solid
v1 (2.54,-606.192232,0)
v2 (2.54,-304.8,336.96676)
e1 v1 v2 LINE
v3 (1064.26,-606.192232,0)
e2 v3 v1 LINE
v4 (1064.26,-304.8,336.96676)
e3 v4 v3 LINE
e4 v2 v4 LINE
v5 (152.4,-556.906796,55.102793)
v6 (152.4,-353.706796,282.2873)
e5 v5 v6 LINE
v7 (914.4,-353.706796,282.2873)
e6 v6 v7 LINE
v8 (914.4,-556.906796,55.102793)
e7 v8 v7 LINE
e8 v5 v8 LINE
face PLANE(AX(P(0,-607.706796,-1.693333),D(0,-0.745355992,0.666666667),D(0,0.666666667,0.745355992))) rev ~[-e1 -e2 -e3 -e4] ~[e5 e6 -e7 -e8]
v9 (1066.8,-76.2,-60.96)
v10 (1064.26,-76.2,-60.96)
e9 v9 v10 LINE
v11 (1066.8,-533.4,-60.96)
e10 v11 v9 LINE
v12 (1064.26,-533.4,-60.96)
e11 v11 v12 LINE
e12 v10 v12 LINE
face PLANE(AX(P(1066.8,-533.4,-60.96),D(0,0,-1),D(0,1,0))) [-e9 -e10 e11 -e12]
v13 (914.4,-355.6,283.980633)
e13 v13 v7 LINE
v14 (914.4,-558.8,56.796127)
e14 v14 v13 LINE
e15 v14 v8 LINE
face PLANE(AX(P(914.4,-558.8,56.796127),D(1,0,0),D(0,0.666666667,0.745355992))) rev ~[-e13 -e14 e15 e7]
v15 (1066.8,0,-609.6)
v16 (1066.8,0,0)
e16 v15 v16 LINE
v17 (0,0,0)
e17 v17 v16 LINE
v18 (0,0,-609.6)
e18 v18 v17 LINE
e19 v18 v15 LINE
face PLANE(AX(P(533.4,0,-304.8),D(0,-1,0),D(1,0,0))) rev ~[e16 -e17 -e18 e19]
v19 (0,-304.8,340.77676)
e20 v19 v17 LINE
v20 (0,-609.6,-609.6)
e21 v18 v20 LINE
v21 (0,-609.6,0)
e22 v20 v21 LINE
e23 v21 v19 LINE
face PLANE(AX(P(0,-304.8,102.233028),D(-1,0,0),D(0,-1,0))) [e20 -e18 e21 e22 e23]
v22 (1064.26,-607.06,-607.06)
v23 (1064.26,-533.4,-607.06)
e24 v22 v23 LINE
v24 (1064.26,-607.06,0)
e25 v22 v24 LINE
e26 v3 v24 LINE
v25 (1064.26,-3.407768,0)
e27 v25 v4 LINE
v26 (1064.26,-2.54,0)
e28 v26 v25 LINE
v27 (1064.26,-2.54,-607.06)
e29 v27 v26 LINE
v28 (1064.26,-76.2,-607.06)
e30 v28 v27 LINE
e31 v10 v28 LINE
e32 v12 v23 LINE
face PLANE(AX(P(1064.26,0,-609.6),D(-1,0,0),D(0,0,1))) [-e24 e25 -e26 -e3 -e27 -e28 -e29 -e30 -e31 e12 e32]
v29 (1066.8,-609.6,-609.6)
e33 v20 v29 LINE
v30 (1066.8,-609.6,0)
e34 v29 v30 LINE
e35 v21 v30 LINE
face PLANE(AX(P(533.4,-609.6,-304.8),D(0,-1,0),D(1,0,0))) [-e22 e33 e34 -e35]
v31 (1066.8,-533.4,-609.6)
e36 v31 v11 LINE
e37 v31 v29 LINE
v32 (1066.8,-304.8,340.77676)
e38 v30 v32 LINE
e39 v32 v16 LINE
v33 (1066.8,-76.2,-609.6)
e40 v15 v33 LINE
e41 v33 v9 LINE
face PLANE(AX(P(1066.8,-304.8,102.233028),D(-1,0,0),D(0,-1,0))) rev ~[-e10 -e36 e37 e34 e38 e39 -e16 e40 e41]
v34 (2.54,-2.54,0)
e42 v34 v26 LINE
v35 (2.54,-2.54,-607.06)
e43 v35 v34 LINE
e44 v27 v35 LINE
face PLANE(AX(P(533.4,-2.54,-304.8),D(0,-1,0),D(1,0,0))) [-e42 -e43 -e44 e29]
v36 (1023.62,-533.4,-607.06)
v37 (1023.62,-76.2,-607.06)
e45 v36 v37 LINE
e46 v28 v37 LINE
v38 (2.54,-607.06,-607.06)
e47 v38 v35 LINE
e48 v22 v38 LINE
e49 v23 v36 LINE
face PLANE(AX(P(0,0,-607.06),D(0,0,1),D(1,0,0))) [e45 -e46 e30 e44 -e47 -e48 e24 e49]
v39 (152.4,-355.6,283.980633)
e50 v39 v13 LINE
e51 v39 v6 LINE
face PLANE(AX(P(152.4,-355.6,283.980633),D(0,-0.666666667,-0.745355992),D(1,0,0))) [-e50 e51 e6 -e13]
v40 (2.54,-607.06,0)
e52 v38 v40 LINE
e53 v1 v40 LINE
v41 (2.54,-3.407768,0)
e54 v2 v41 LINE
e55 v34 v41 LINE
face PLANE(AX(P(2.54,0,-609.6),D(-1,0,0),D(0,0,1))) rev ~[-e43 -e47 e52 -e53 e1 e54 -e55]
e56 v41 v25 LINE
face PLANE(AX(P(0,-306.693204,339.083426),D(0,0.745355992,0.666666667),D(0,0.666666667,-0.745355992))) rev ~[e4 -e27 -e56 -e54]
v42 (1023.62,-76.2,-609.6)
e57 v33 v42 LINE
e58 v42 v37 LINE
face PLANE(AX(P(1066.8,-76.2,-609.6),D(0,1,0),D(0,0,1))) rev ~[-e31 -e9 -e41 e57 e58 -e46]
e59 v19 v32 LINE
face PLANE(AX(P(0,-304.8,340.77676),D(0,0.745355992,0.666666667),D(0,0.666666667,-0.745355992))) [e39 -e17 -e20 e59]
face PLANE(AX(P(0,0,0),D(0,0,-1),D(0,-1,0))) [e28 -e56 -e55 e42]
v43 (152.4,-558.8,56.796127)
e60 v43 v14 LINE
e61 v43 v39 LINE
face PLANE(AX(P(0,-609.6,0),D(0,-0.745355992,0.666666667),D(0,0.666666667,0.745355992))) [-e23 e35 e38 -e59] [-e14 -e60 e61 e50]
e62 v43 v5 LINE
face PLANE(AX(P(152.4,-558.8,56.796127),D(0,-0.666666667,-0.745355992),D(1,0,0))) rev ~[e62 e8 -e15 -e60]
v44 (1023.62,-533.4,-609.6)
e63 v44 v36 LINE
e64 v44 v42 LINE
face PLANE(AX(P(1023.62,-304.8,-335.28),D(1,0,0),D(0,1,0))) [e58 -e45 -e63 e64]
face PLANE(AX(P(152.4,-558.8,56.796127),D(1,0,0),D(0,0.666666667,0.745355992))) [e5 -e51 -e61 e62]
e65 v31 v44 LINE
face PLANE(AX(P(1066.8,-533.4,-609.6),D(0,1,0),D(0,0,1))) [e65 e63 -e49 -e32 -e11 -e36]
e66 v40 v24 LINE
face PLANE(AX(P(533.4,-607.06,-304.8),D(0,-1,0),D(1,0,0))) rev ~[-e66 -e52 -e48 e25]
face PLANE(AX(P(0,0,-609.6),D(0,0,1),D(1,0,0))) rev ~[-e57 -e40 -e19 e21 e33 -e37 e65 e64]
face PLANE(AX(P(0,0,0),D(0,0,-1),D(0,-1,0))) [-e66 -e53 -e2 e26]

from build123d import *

# Parameters (mm, degrees)
F0_W         = 1066.8
F0_H         = 609.6
F1_DEPTH     = 609.6
F2_T         = -2.54
F3_W         = 457.2
F3_H         = 548.64
F4_DEPTH     = 43.18
F6_DEPTH     = 1066.8
F7_T         = 2.54
F7_T3_DEPTH  = 7.62
F7_T5_DEPTH  = 7.62
F7_T7_DEPTH  = 612.14
F7_T9_DEPTH  = 78.74
F7_T11_DEPTH = 78.74
F7_T13_DEPTH = 1066.8
F7_T15_DEPTH = 609.6
F8_W         = 762
F8_H         = 304.8
F9_DEPTH     = 25.4


# Not quite as in the source:
# - a shell that OpenCascade refuses in one call is made with other operations: the cavity is built on its own and cut out


with BuildPart() as f1:
    # F0 (on Front) → F1 (new body)
    with BuildSketch(Plane.XZ):
        with Locations((533.4, -304.8)):
            Rectangle(F0_W, F0_H)
    extrude(amount=F1_DEPTH)

    # F2
    f2_openings = [f1.faces().sort_by_distance(p)[0] for p in [
        (533.4, -304.8, 0),
    ]]
    offset(amount=F2_T, openings=f2_openings)

    # F3 (on face) → F4 (cut)
    with BuildSketch(Plane.YZ.offset(1066.8)):
        with Locations((-304.8, -335.28)):
            Rectangle(F3_W, F3_H)
    extrude(amount=-F4_DEPTH, mode=Mode.SUBTRACT)

    # F5 (on face) → F6 (join)
    with BuildSketch(Plane(origin=(0, 0, 0), x_dir=(0, -1, 0), z_dir=(-1, 0, 0))):
        Polygon((304.8, 340.776759771), (0, 0), (609.6, 0), align=None)
    extrude(amount=-F6_DEPTH)

    # F7: shell of thickness 2.54, made by hand


with BuildPart() as f7_core1:
    # F7_t2: copy of F1
    add(f1.part)

    # the walls: a layer under each face that stays
    f7_faces = [f7_core1.faces().sort_by_distance(p)[0] for p in [
        (0, -304.8, -134.4116201145),
        (533.4, -304.8, -609.6),
        (533.4, 0, -304.8),
        (533.4, -609.6, -304.8),
        (533.4, -152.4, 170.3883798855),
        (533.4, -457.2, 170.3883798855),
        (1066.8, -304.8, 182.3806331425),
        (1065.3606666667, -76.2, -591.312),
        (1023.62, -304.8, -608.33),
        (1065.3606666667, -533.4, -79.248),
        (1065.53, -304.8, -60.96),
        (1064.26, -563.88, -563.6985714286),
        (533.4, -304.8, -607.06),
        (533.4, -607.06, -303.53),
        (533.4, -2.54, -303.53),
        (2.54, -304.8, -303.53),
    ]]
    thicken(f7_faces, amount=-F7_T, mode=Mode.SUBTRACT)

    # F7_s4 → F7_t3 (cut)
    with BuildSketch(Plane.YZ.offset(1061.72)):
        Polygon((-76.2254, -60.9854), (-73.66, -60.96), (-73.66, -58.42), (-76.2, -58.42), align=None)
        Polygon((-533.3746, -60.9854), (-535.94, -60.96), (-535.94, -58.42), (-533.4, -58.42), align=None)
    extrude(amount=F7_T3_DEPTH, mode=Mode.SUBTRACT)

    # F7_s6 → F7_t5 (cut)
    with BuildSketch(Plane.XY.offset(-612.14)):
        Polygon((1023.6454, -76.2254), (1023.62, -73.66), (1021.08, -73.66), (1021.08, -76.2), align=None)
        Polygon((1023.6454, -533.3746), (1021.08, -533.4), (1021.08, -535.94), (1023.62, -535.94), align=None)
    extrude(amount=F7_T5_DEPTH, mode=Mode.SUBTRACT)

    # F7_s8 → F7_t7 (cut)
    with BuildSketch(Plane.XY.offset(-609.6)):
        Polygon((1064.2346, -607.0346), (1066.8, -607.06), (1066.8, -609.6), (1064.26, -609.6), align=None)
        Polygon((1064.2346, -2.5654), (1066.8, -2.54), (1066.8, 0), (1064.26, 0), align=None)
        Polygon((2.5654, -607.0346), (2.54, -609.6), (0, -609.6), (0, -607.06), align=None)
        Polygon((2.5654, -2.5654), (2.54, 0), (0, 0), (0, -2.54), align=None)
    extrude(amount=F7_T7_DEPTH, mode=Mode.SUBTRACT)

    # F7_s10 → F7_t9 (cut)
    with BuildSketch(Plane.XZ.offset(530.86)):
        Polygon((1064.2346, -607.0346), (1066.8, -607.06), (1066.8, -609.6), (1064.26, -609.6), align=None)
    extrude(amount=F7_T9_DEPTH, mode=Mode.SUBTRACT)

    # F7_s12 → F7_t11 (cut)
    with BuildSketch(Plane.XZ):
        Polygon((1064.2346, -607.0346), (1066.8, -607.06), (1066.8, -609.6), (1064.26, -609.6), align=None)
    extrude(amount=F7_T11_DEPTH, mode=Mode.SUBTRACT)

    # F7_s14 → F7_t13 (cut)
    with BuildSketch(Plane.YZ):
        Polygon((-607.0346, -607.0346), (-607.06, -609.6), (-609.6, -609.6), (-609.6, -607.06), align=None)
        Polygon((-2.5654, -607.0346), (-2.54, -609.6), (0, -609.6), (0, -607.06), align=None)
    extrude(amount=F7_T13_DEPTH, mode=Mode.SUBTRACT)

    # F7_s16 → F7_t15 (cut)
    with BuildSketch(Plane.XZ):
        Polygon((2.5654, -607.0346), (2.54, -609.6), (0, -609.6), (0, -607.06), align=None)
    extrude(amount=F7_T15_DEPTH, mode=Mode.SUBTRACT)


with BuildPart() as f1_1:
    add(f1.part)

    # what is left inside the walls is the cavity
    f7_cavity = [f7_core1.part.solids().sort_by_distance(p)[0] for p in [
        (710.353333, -304.8, 0.0254),
    ]]
    add(f7_cavity, mode=Mode.SUBTRACT)

    # F8 (on face) → F9 (cut)
    with BuildSketch(Plane(origin=(0, -338.6666666667, 302.912675352), x_dir=(1, 0, 0), z_dir=(0, -0.7453559925, 0.6666666667))):
        with Locations((533.4, -177.8)):
            Rectangle(F8_W, F8_H)
    extrude(amount=-F9_DEPTH, mode=Mode.SUBTRACT)


solid = f1_1.part
